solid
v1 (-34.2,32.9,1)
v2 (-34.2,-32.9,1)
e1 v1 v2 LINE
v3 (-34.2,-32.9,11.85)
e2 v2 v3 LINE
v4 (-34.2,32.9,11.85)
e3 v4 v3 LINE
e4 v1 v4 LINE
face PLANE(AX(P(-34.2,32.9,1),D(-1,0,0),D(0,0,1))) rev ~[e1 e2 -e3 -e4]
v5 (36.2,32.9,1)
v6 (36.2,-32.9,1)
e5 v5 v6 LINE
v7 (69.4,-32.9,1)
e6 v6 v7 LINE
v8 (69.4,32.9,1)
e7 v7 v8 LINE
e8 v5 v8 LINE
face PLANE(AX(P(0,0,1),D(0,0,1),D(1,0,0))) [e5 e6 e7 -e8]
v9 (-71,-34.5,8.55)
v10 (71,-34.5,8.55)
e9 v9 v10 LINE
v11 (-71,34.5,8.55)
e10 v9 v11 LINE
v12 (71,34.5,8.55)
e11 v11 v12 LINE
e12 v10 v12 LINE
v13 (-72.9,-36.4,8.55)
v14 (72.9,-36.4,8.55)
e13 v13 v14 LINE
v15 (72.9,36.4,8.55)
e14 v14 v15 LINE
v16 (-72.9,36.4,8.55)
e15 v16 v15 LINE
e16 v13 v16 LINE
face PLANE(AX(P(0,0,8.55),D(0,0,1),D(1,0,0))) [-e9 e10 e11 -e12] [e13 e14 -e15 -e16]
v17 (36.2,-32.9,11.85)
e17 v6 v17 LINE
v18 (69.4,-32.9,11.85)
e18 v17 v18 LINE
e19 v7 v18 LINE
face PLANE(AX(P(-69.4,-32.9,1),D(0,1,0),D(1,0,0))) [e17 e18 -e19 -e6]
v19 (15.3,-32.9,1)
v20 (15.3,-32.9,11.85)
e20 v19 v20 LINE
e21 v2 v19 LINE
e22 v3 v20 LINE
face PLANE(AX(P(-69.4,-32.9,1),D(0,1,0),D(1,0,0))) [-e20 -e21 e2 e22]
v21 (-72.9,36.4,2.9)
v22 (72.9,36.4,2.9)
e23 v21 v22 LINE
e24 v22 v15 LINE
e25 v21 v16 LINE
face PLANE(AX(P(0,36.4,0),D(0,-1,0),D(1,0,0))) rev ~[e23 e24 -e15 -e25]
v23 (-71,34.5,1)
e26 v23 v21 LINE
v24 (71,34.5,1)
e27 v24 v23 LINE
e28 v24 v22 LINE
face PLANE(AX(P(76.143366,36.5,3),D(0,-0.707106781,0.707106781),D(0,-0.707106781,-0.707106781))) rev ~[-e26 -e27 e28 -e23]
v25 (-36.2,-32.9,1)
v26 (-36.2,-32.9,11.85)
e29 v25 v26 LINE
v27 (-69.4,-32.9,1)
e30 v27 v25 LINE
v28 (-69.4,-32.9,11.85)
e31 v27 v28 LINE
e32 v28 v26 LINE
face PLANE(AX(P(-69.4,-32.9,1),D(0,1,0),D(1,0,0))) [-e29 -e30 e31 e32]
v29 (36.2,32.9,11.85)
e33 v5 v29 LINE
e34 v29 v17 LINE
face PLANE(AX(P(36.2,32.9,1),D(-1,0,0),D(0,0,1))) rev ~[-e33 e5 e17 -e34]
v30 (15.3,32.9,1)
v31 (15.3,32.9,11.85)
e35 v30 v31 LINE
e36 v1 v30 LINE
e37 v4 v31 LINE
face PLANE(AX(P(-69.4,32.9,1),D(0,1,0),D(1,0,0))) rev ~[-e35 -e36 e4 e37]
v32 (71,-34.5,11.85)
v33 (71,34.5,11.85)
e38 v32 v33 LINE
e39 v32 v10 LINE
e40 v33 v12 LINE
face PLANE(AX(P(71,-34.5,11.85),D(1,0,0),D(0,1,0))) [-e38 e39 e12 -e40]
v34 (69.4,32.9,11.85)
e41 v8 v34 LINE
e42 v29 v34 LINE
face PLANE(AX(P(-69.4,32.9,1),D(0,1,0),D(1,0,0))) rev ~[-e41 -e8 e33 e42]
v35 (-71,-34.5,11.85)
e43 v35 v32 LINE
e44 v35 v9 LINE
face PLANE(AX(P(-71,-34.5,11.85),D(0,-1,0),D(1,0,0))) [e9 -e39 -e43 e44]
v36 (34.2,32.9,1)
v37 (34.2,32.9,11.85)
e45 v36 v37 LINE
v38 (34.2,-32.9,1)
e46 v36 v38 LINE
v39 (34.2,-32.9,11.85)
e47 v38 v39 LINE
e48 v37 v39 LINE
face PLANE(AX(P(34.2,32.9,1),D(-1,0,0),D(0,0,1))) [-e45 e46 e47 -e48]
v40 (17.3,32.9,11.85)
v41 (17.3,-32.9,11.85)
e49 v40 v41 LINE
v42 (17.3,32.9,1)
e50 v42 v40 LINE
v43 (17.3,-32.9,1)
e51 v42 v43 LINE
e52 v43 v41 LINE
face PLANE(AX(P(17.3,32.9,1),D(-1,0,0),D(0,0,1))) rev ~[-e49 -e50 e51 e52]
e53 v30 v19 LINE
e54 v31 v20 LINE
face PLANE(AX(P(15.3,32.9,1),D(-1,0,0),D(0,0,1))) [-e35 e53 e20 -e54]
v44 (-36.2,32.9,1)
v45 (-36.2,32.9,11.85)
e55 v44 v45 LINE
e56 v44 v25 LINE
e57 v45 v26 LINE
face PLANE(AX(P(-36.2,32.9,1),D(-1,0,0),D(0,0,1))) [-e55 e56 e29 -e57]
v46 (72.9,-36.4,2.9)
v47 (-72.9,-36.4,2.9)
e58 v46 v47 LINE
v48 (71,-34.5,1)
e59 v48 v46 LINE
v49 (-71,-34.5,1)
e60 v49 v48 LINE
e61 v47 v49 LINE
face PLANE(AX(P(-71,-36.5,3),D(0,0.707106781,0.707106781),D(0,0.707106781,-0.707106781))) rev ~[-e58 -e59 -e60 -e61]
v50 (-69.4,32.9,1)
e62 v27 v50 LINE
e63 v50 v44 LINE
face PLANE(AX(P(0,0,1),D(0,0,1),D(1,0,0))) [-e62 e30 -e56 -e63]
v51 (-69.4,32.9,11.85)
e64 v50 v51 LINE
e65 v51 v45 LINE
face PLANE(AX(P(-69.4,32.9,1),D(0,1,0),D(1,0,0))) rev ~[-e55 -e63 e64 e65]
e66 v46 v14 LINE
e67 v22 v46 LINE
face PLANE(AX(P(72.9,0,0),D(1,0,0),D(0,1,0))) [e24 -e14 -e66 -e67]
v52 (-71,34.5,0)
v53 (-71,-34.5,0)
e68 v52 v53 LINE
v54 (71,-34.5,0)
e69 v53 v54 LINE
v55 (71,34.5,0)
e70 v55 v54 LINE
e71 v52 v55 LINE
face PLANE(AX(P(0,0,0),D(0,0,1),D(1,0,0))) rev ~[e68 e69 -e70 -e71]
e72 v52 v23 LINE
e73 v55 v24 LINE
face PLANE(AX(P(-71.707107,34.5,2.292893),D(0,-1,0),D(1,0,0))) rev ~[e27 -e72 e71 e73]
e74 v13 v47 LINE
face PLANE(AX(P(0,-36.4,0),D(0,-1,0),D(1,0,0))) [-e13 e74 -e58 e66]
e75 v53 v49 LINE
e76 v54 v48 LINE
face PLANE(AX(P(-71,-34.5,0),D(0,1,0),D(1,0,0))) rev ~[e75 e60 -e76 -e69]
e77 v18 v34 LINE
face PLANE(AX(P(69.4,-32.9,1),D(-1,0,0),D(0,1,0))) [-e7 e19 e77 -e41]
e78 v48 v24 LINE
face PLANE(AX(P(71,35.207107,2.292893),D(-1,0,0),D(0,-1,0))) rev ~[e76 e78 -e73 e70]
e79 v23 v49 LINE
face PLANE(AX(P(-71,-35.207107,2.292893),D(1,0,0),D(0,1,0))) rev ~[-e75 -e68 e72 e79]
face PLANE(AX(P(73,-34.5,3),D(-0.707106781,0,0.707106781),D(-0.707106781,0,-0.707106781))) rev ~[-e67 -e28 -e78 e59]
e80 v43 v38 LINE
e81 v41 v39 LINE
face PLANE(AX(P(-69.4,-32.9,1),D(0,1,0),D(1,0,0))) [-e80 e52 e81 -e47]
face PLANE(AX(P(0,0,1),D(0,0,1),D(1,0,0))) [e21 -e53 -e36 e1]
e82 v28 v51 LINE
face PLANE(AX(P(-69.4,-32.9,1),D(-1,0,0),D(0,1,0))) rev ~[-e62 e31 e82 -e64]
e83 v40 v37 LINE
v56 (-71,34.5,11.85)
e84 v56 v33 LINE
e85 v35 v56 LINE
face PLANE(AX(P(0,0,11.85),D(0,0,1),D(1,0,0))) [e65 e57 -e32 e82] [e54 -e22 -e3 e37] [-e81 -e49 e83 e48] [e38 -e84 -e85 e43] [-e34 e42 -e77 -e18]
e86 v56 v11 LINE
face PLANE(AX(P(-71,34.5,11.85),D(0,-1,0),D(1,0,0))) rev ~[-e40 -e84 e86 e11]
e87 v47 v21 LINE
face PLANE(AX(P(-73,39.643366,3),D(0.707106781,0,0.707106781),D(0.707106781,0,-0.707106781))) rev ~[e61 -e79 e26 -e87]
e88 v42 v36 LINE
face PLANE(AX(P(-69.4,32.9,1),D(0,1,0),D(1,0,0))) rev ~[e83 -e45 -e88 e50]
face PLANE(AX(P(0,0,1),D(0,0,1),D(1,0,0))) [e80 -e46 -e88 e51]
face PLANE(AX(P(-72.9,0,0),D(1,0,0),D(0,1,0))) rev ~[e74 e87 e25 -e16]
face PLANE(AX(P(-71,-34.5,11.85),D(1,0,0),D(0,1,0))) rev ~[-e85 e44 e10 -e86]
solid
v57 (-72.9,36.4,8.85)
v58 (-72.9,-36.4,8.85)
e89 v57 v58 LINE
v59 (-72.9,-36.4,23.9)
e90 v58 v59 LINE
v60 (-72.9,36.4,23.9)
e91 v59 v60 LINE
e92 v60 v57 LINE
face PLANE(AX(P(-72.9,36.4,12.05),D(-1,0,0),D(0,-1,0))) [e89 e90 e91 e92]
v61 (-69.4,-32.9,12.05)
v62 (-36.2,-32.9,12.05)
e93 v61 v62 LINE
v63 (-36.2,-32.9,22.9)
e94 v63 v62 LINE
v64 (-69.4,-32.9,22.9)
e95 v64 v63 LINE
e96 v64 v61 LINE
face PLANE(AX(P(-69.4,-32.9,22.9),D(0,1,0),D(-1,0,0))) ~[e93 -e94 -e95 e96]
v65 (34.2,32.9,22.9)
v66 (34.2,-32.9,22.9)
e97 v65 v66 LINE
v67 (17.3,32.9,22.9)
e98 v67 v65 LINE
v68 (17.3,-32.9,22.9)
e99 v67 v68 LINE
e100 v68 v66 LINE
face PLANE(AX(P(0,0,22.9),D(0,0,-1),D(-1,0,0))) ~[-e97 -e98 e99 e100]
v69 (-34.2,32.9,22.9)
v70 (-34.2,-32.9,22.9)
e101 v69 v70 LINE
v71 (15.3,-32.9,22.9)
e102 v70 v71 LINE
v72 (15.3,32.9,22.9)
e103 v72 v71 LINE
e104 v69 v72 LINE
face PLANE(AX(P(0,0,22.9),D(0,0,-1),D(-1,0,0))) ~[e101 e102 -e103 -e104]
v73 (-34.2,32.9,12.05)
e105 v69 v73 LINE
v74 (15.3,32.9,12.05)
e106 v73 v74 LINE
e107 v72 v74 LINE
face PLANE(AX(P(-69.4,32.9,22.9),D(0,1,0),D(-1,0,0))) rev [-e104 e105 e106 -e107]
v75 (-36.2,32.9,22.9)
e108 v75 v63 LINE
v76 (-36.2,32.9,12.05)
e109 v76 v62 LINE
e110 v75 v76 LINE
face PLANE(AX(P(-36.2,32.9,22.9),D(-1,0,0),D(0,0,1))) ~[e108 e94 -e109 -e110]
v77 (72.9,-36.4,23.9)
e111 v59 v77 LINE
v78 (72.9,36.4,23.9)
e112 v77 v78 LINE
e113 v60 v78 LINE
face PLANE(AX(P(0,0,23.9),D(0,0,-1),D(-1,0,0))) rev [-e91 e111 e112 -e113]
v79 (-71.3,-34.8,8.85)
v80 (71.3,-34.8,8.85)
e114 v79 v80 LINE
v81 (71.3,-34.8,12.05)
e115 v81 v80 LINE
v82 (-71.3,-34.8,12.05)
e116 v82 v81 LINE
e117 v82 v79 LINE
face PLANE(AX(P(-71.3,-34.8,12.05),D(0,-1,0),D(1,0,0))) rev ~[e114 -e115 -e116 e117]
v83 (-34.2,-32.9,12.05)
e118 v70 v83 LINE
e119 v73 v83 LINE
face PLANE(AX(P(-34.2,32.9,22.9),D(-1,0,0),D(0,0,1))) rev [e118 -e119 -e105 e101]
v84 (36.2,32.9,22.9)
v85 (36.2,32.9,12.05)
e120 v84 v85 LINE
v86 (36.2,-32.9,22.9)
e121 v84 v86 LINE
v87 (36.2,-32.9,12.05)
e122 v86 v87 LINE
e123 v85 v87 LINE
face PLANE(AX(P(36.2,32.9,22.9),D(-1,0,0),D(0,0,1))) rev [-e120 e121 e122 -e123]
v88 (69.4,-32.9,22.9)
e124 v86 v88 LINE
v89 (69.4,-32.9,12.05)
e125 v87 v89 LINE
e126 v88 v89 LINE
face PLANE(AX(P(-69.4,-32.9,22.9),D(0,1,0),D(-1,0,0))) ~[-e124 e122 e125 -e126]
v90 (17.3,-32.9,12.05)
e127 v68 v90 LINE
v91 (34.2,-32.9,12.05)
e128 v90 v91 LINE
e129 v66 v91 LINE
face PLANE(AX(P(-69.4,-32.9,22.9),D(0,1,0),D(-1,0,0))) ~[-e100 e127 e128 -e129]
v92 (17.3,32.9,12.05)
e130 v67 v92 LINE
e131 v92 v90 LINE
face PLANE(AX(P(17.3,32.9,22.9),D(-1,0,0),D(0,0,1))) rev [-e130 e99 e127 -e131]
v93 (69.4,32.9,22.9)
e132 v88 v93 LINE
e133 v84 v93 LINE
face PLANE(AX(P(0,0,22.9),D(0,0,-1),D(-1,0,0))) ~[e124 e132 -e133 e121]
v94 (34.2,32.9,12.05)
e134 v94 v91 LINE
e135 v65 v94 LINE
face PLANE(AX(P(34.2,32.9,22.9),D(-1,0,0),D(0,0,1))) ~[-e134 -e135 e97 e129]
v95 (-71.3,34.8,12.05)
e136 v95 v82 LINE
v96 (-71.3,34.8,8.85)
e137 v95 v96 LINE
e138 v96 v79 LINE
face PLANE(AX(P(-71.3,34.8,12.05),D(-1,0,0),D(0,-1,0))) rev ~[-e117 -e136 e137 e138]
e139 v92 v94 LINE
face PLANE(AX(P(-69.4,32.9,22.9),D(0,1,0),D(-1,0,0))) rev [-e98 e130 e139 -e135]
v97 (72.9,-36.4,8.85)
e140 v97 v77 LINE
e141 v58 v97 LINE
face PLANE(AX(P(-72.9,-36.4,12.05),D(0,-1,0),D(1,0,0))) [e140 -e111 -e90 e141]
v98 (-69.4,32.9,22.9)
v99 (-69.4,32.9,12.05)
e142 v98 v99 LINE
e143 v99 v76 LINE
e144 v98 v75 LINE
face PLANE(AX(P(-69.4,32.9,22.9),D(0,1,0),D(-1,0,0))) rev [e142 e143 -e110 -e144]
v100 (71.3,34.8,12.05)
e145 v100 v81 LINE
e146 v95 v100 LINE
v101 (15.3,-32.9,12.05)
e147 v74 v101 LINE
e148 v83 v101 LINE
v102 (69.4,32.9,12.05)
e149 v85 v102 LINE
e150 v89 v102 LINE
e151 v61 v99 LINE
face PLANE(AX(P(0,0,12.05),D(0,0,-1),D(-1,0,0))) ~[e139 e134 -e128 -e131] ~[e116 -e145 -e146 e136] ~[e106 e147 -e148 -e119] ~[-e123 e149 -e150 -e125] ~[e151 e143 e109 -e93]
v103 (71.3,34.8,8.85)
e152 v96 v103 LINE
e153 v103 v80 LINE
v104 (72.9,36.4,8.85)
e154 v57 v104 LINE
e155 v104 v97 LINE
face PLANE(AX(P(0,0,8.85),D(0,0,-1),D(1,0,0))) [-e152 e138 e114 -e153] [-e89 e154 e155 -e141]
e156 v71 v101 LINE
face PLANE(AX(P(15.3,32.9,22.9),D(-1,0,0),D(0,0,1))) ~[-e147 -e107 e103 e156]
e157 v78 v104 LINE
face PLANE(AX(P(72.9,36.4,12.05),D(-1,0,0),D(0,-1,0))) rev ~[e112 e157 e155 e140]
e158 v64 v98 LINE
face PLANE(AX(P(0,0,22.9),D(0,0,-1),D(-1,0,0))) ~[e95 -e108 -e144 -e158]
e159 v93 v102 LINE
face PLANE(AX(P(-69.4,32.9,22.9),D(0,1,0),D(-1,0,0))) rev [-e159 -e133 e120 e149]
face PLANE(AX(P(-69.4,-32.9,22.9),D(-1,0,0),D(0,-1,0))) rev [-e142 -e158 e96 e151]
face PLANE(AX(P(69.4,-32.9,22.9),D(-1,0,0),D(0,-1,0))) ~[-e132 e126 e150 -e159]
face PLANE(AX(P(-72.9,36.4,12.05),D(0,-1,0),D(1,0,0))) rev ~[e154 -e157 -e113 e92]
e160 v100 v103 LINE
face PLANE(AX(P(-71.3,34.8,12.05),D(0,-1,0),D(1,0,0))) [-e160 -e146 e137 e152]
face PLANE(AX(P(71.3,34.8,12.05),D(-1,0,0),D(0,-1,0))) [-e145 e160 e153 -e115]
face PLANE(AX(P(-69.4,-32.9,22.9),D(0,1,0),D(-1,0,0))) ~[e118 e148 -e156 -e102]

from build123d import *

# Parameters (mm, degrees)
F4_W          = 145.8
F4_H          = 72.8
F5_DEPTH      = 1
F6_W          = 145.8
F6_H          = 72.8
F6_W_2        = 138.8
F6_H_2        = 65.8
F7_DEPTH      = 10.85
F8_W          = 2
F8_H          = 10.85
F9_DEPTH      = 65.8
F12_W         = 145.8
F12_H         = 72.8
F12_W_2       = 142
F12_H_2       = 69
F13_DEPTH     = 3.3
F14_W         = 145.8
F14_H         = 72.8
F14_W_2       = 142
F14_H_2       = 69
F15_DEPTH     = 3
F16_T4_DEPTH  = 142
F16_T9_DEPTH  = 69
F16_T14_DEPTH = 142
F16_T19_DEPTH = 69
F16_T25_DEPTH = 147.1433659759
F16_T31_DEPTH = 74.1433659759
F16_T40_DEPTH = 147.1433659759
F16_T46_DEPTH = 74.1433659759
F16_T55_DEPTH = 147.1433659759
F16_T61_DEPTH = 74.1433659759
F16_T70_DEPTH = 74.1433659759
F16_T76_DEPTH = 147.1433659759
F17_W         = 145.8
F17_H         = 72.8
F17_W_2       = 142.6
F17_H_2       = 69.6
F18_DEPTH     = 3.2


# Not quite as in the source:
# - a fillet or chamfer that OpenCascade refuses, or shapes differently, is made with other operations: its cross-section is extruded or revolved along the edge and cut away or added


with BuildPart() as f5:
    # F4 (on Top) → F5 (new body)
    with BuildSketch(Plane.XY):
        Rectangle(F4_W, F4_H)
    extrude(amount=F5_DEPTH)

    # F6 (on face) → F7 (join)
    with BuildSketch(Plane.XY.offset(1)):
        Rectangle(F6_W, F6_H)
        Rectangle(F6_W_2, F6_H_2, mode=Mode.SUBTRACT)
    extrude(amount=F7_DEPTH)

    # F8 (on face) → F9 (join, through all)
    with BuildSketch(Plane.XZ.offset(-32.9)):
        with Locations((-35.2, 6.425)):
            Rectangle(F8_W, F8_H)
        with Locations((16.3, 6.425)):
            Rectangle(F8_W, F8_H)
        with Locations((35.2, 6.425)):
            Rectangle(F8_W, F8_H)
    extrude(amount=F9_DEPTH)


with BuildPart() as f11_1:
    # F11: instance of F5
    add(f5.part.mirror(Plane(origin=(1.1434328358, 0, 11.95), x_dir=(1, 0, 0), z_dir=(0, 0, 1))))

    # F17 (on face) → F18 (join)
    with BuildSketch(Plane(origin=(0, 0, 12.05), x_dir=(1, 0, 0), z_dir=(0, 0, -1))):
        Rectangle(F17_W, F17_H)
        Rectangle(F17_W_2, F17_H_2, mode=Mode.SUBTRACT)
    extrude(amount=F18_DEPTH)


with BuildPart() as f5_1:
    add(f5.part)

    # F12 (on face) → F13 (cut)
    with BuildSketch(Plane.XY.offset(11.85)):
        Rectangle(F12_W, F12_H)
        Rectangle(F12_W_2, F12_H_2, mode=Mode.SUBTRACT)
    extrude(amount=-F13_DEPTH, mode=Mode.SUBTRACT)

    # F14 (on face) → F15 (cut)
    with BuildSketch(Plane(origin=(0, 0, 0), x_dir=(1, 0, 0), z_dir=(0, 0, -1))):
        Rectangle(F14_W, F14_H)
        Rectangle(F14_W_2, F14_H_2, mode=Mode.SUBTRACT)
    extrude(amount=-F15_DEPTH, mode=Mode.SUBTRACT)

    # F16: chamfer of 2 on 4 edges, made by hand


with BuildPart() as f16_tool2:
    # F16_s3 → F16_t4 (new body)
    with BuildSketch(Plane.YZ.offset(-71)):
        Polygon((-36.5, 3), (-34.5, 1), (-34.5, 3), align=None)
    extrude(amount=F16_T4_DEPTH)

    split(bisect_by=Plane.XZ.offset(36.4), keep=Keep.BOTTOM)


with BuildPart() as f5_2:
    add(f5_1.part)

    # F16_t1: union F16_tool2
    add(f16_tool2.part)


with BuildPart() as f16_tool7:
    # F16_s8 → F16_t9 (new body)
    with BuildSketch(Plane.XZ.offset(-34.5)):
        Polygon((-73, 3), (-71, 1), (-71, 3), align=None)
    extrude(amount=F16_T9_DEPTH)

    split(bisect_by=Plane.YZ.offset(-72.9), keep=Keep.TOP)


with BuildPart() as f5_3:
    add(f5_2.part)

    # F16_t6: union F16_tool7
    add(f16_tool7.part)


with BuildPart() as f16_tool12:
    # F16_s13 → F16_t14 (new body)
    with BuildSketch(Plane.YZ.offset(71)):
        Polygon((36.5, 3), (34.5, 1), (34.5, 3), align=None)
    extrude(amount=-F16_T14_DEPTH)

    split(bisect_by=Plane.XZ.offset(-36.4), keep=Keep.TOP)


with BuildPart() as f5_4:
    add(f5_3.part)

    # F16_t11: union F16_tool12
    add(f16_tool12.part)


with BuildPart() as f16_tool17:
    # F16_s18 → F16_t19 (new body)
    with BuildSketch(Plane.XZ.offset(34.5)):
        Polygon((73, 3), (71, 1), (71, 3), align=None)
    extrude(amount=-F16_T19_DEPTH)

    split(bisect_by=Plane.YZ.offset(72.9), keep=Keep.BOTTOM)


with BuildPart() as f5_5:
    add(f5_4.part)

    # F16_t16: union F16_tool17
    add(f16_tool17.part)


with BuildPart() as f16_tool23:
    # F16_s24 → F16_t25 (new body)
    with BuildSketch(Plane.YZ.offset(-76.1433659759)):
        Polygon((-36.5, 3), (-34.5, 1), (-34.5, 3), align=None)
    extrude(amount=F16_T25_DEPTH)

    split(bisect_by=Plane.XZ.offset(36.4), keep=Keep.BOTTOM)

    split(bisect_by=Plane.YZ.offset(-72.9), keep=Keep.TOP)

    split(bisect_by=Plane.YZ.offset(-71), keep=Keep.BOTTOM)


with BuildPart() as f16_tool29:
    # F16_s30 → F16_t31 (new body)
    with BuildSketch(Plane.XZ.offset(-34.5)):
        Polygon((-73, 3), (-71, 1), (-71, 3), align=None)
    extrude(amount=F16_T31_DEPTH)

    split(bisect_by=Plane.XZ.offset(36.4), keep=Keep.BOTTOM)

    split(bisect_by=Plane.YZ.offset(-72.9), keep=Keep.TOP)

    split(bisect_by=Plane.XZ.offset(34.5), keep=Keep.TOP)


with BuildPart() as f16_tool23_1:
    add(f16_tool23.part)

    # F16_t35: intersect F16_tool29
    add(f16_tool29.part, mode=Mode.INTERSECT)


with BuildPart() as f5_6:
    add(f5_5.part)

    # F16_t21: union F16_tool23
    add(f16_tool23_1.part)


with BuildPart() as f16_tool38:
    # F16_s39 → F16_t40 (new body)
    with BuildSketch(Plane.YZ.offset(-71)):
        Polygon((-36.5, 3), (-34.5, 1), (-34.5, 3), align=None)
    extrude(amount=F16_T40_DEPTH)

    split(bisect_by=Plane.XZ.offset(36.4), keep=Keep.BOTTOM)

    split(bisect_by=Plane.YZ.offset(72.9), keep=Keep.BOTTOM)

    split(bisect_by=Plane.YZ.offset(71), keep=Keep.TOP)


with BuildPart() as f16_tool44:
    # F16_s45 → F16_t46 (new body)
    with BuildSketch(Plane.XZ.offset(39.6433659759)):
        Polygon((73, 3), (71, 1), (71, 3), align=None)
    extrude(amount=-F16_T46_DEPTH)

    split(bisect_by=Plane.XZ.offset(36.4), keep=Keep.BOTTOM)

    split(bisect_by=Plane.YZ.offset(72.9), keep=Keep.BOTTOM)

    split(bisect_by=Plane.XZ.offset(34.5), keep=Keep.TOP)


with BuildPart() as f16_tool38_1:
    add(f16_tool38.part)

    # F16_t50: intersect F16_tool44
    add(f16_tool44.part, mode=Mode.INTERSECT)


with BuildPart() as f5_7:
    add(f5_6.part)

    # F16_t36: union F16_tool38
    add(f16_tool38_1.part)


with BuildPart() as f16_tool53:
    # F16_s54 → F16_t55 (new body)
    with BuildSketch(Plane.YZ.offset(71)):
        Polygon((36.5, 3), (34.5, 1), (34.5, 3), align=None)
    extrude(amount=-F16_T55_DEPTH)

    split(bisect_by=Plane.YZ.offset(-72.9), keep=Keep.TOP)

    split(bisect_by=Plane.XZ.offset(-36.4), keep=Keep.TOP)

    split(bisect_by=Plane.YZ.offset(-71), keep=Keep.BOTTOM)


with BuildPart() as f16_tool59:
    # F16_s60 → F16_t61 (new body)
    with BuildSketch(Plane.XZ.offset(-39.6433659759)):
        Polygon((-73, 3), (-71, 1), (-71, 3), align=None)
    extrude(amount=F16_T61_DEPTH)

    split(bisect_by=Plane.YZ.offset(-72.9), keep=Keep.TOP)

    split(bisect_by=Plane.XZ.offset(-36.4), keep=Keep.TOP)

    split(bisect_by=Plane.XZ.offset(-34.5), keep=Keep.BOTTOM)


with BuildPart() as f16_tool53_1:
    add(f16_tool53.part)

    # F16_t65: intersect F16_tool59
    add(f16_tool59.part, mode=Mode.INTERSECT)


with BuildPart() as f5_8:
    add(f5_7.part)

    # F16_t51: union F16_tool53
    add(f16_tool53_1.part)


with BuildPart() as f16_tool68:
    # F16_s69 → F16_t70 (new body)
    with BuildSketch(Plane.XZ.offset(34.5)):
        Polygon((73, 3), (71, 1), (71, 3), align=None)
    extrude(amount=-F16_T70_DEPTH)

    split(bisect_by=Plane.YZ.offset(72.9), keep=Keep.BOTTOM)

    split(bisect_by=Plane.XZ.offset(-36.4), keep=Keep.TOP)

    split(bisect_by=Plane.XZ.offset(-34.5), keep=Keep.BOTTOM)


with BuildPart() as f16_tool74:
    # F16_s75 → F16_t76 (new body)
    with BuildSketch(Plane.YZ.offset(76.1433659759)):
        Polygon((36.5, 3), (34.5, 1), (34.5, 3), align=None)
    extrude(amount=-F16_T76_DEPTH)

    split(bisect_by=Plane.YZ.offset(72.9), keep=Keep.BOTTOM)

    split(bisect_by=Plane.XZ.offset(-36.4), keep=Keep.TOP)

    split(bisect_by=Plane.YZ.offset(71), keep=Keep.TOP)


with BuildPart() as f16_tool68_1:
    add(f16_tool68.part)

    # F16_t80: intersect F16_tool74
    add(f16_tool74.part, mode=Mode.INTERSECT)


with BuildPart() as f5_9:
    add(f5_8.part)

    # F16_t66: union F16_tool68
    add(f16_tool68_1.part)


solid = Compound([f11_1.part, f5_9.part])
